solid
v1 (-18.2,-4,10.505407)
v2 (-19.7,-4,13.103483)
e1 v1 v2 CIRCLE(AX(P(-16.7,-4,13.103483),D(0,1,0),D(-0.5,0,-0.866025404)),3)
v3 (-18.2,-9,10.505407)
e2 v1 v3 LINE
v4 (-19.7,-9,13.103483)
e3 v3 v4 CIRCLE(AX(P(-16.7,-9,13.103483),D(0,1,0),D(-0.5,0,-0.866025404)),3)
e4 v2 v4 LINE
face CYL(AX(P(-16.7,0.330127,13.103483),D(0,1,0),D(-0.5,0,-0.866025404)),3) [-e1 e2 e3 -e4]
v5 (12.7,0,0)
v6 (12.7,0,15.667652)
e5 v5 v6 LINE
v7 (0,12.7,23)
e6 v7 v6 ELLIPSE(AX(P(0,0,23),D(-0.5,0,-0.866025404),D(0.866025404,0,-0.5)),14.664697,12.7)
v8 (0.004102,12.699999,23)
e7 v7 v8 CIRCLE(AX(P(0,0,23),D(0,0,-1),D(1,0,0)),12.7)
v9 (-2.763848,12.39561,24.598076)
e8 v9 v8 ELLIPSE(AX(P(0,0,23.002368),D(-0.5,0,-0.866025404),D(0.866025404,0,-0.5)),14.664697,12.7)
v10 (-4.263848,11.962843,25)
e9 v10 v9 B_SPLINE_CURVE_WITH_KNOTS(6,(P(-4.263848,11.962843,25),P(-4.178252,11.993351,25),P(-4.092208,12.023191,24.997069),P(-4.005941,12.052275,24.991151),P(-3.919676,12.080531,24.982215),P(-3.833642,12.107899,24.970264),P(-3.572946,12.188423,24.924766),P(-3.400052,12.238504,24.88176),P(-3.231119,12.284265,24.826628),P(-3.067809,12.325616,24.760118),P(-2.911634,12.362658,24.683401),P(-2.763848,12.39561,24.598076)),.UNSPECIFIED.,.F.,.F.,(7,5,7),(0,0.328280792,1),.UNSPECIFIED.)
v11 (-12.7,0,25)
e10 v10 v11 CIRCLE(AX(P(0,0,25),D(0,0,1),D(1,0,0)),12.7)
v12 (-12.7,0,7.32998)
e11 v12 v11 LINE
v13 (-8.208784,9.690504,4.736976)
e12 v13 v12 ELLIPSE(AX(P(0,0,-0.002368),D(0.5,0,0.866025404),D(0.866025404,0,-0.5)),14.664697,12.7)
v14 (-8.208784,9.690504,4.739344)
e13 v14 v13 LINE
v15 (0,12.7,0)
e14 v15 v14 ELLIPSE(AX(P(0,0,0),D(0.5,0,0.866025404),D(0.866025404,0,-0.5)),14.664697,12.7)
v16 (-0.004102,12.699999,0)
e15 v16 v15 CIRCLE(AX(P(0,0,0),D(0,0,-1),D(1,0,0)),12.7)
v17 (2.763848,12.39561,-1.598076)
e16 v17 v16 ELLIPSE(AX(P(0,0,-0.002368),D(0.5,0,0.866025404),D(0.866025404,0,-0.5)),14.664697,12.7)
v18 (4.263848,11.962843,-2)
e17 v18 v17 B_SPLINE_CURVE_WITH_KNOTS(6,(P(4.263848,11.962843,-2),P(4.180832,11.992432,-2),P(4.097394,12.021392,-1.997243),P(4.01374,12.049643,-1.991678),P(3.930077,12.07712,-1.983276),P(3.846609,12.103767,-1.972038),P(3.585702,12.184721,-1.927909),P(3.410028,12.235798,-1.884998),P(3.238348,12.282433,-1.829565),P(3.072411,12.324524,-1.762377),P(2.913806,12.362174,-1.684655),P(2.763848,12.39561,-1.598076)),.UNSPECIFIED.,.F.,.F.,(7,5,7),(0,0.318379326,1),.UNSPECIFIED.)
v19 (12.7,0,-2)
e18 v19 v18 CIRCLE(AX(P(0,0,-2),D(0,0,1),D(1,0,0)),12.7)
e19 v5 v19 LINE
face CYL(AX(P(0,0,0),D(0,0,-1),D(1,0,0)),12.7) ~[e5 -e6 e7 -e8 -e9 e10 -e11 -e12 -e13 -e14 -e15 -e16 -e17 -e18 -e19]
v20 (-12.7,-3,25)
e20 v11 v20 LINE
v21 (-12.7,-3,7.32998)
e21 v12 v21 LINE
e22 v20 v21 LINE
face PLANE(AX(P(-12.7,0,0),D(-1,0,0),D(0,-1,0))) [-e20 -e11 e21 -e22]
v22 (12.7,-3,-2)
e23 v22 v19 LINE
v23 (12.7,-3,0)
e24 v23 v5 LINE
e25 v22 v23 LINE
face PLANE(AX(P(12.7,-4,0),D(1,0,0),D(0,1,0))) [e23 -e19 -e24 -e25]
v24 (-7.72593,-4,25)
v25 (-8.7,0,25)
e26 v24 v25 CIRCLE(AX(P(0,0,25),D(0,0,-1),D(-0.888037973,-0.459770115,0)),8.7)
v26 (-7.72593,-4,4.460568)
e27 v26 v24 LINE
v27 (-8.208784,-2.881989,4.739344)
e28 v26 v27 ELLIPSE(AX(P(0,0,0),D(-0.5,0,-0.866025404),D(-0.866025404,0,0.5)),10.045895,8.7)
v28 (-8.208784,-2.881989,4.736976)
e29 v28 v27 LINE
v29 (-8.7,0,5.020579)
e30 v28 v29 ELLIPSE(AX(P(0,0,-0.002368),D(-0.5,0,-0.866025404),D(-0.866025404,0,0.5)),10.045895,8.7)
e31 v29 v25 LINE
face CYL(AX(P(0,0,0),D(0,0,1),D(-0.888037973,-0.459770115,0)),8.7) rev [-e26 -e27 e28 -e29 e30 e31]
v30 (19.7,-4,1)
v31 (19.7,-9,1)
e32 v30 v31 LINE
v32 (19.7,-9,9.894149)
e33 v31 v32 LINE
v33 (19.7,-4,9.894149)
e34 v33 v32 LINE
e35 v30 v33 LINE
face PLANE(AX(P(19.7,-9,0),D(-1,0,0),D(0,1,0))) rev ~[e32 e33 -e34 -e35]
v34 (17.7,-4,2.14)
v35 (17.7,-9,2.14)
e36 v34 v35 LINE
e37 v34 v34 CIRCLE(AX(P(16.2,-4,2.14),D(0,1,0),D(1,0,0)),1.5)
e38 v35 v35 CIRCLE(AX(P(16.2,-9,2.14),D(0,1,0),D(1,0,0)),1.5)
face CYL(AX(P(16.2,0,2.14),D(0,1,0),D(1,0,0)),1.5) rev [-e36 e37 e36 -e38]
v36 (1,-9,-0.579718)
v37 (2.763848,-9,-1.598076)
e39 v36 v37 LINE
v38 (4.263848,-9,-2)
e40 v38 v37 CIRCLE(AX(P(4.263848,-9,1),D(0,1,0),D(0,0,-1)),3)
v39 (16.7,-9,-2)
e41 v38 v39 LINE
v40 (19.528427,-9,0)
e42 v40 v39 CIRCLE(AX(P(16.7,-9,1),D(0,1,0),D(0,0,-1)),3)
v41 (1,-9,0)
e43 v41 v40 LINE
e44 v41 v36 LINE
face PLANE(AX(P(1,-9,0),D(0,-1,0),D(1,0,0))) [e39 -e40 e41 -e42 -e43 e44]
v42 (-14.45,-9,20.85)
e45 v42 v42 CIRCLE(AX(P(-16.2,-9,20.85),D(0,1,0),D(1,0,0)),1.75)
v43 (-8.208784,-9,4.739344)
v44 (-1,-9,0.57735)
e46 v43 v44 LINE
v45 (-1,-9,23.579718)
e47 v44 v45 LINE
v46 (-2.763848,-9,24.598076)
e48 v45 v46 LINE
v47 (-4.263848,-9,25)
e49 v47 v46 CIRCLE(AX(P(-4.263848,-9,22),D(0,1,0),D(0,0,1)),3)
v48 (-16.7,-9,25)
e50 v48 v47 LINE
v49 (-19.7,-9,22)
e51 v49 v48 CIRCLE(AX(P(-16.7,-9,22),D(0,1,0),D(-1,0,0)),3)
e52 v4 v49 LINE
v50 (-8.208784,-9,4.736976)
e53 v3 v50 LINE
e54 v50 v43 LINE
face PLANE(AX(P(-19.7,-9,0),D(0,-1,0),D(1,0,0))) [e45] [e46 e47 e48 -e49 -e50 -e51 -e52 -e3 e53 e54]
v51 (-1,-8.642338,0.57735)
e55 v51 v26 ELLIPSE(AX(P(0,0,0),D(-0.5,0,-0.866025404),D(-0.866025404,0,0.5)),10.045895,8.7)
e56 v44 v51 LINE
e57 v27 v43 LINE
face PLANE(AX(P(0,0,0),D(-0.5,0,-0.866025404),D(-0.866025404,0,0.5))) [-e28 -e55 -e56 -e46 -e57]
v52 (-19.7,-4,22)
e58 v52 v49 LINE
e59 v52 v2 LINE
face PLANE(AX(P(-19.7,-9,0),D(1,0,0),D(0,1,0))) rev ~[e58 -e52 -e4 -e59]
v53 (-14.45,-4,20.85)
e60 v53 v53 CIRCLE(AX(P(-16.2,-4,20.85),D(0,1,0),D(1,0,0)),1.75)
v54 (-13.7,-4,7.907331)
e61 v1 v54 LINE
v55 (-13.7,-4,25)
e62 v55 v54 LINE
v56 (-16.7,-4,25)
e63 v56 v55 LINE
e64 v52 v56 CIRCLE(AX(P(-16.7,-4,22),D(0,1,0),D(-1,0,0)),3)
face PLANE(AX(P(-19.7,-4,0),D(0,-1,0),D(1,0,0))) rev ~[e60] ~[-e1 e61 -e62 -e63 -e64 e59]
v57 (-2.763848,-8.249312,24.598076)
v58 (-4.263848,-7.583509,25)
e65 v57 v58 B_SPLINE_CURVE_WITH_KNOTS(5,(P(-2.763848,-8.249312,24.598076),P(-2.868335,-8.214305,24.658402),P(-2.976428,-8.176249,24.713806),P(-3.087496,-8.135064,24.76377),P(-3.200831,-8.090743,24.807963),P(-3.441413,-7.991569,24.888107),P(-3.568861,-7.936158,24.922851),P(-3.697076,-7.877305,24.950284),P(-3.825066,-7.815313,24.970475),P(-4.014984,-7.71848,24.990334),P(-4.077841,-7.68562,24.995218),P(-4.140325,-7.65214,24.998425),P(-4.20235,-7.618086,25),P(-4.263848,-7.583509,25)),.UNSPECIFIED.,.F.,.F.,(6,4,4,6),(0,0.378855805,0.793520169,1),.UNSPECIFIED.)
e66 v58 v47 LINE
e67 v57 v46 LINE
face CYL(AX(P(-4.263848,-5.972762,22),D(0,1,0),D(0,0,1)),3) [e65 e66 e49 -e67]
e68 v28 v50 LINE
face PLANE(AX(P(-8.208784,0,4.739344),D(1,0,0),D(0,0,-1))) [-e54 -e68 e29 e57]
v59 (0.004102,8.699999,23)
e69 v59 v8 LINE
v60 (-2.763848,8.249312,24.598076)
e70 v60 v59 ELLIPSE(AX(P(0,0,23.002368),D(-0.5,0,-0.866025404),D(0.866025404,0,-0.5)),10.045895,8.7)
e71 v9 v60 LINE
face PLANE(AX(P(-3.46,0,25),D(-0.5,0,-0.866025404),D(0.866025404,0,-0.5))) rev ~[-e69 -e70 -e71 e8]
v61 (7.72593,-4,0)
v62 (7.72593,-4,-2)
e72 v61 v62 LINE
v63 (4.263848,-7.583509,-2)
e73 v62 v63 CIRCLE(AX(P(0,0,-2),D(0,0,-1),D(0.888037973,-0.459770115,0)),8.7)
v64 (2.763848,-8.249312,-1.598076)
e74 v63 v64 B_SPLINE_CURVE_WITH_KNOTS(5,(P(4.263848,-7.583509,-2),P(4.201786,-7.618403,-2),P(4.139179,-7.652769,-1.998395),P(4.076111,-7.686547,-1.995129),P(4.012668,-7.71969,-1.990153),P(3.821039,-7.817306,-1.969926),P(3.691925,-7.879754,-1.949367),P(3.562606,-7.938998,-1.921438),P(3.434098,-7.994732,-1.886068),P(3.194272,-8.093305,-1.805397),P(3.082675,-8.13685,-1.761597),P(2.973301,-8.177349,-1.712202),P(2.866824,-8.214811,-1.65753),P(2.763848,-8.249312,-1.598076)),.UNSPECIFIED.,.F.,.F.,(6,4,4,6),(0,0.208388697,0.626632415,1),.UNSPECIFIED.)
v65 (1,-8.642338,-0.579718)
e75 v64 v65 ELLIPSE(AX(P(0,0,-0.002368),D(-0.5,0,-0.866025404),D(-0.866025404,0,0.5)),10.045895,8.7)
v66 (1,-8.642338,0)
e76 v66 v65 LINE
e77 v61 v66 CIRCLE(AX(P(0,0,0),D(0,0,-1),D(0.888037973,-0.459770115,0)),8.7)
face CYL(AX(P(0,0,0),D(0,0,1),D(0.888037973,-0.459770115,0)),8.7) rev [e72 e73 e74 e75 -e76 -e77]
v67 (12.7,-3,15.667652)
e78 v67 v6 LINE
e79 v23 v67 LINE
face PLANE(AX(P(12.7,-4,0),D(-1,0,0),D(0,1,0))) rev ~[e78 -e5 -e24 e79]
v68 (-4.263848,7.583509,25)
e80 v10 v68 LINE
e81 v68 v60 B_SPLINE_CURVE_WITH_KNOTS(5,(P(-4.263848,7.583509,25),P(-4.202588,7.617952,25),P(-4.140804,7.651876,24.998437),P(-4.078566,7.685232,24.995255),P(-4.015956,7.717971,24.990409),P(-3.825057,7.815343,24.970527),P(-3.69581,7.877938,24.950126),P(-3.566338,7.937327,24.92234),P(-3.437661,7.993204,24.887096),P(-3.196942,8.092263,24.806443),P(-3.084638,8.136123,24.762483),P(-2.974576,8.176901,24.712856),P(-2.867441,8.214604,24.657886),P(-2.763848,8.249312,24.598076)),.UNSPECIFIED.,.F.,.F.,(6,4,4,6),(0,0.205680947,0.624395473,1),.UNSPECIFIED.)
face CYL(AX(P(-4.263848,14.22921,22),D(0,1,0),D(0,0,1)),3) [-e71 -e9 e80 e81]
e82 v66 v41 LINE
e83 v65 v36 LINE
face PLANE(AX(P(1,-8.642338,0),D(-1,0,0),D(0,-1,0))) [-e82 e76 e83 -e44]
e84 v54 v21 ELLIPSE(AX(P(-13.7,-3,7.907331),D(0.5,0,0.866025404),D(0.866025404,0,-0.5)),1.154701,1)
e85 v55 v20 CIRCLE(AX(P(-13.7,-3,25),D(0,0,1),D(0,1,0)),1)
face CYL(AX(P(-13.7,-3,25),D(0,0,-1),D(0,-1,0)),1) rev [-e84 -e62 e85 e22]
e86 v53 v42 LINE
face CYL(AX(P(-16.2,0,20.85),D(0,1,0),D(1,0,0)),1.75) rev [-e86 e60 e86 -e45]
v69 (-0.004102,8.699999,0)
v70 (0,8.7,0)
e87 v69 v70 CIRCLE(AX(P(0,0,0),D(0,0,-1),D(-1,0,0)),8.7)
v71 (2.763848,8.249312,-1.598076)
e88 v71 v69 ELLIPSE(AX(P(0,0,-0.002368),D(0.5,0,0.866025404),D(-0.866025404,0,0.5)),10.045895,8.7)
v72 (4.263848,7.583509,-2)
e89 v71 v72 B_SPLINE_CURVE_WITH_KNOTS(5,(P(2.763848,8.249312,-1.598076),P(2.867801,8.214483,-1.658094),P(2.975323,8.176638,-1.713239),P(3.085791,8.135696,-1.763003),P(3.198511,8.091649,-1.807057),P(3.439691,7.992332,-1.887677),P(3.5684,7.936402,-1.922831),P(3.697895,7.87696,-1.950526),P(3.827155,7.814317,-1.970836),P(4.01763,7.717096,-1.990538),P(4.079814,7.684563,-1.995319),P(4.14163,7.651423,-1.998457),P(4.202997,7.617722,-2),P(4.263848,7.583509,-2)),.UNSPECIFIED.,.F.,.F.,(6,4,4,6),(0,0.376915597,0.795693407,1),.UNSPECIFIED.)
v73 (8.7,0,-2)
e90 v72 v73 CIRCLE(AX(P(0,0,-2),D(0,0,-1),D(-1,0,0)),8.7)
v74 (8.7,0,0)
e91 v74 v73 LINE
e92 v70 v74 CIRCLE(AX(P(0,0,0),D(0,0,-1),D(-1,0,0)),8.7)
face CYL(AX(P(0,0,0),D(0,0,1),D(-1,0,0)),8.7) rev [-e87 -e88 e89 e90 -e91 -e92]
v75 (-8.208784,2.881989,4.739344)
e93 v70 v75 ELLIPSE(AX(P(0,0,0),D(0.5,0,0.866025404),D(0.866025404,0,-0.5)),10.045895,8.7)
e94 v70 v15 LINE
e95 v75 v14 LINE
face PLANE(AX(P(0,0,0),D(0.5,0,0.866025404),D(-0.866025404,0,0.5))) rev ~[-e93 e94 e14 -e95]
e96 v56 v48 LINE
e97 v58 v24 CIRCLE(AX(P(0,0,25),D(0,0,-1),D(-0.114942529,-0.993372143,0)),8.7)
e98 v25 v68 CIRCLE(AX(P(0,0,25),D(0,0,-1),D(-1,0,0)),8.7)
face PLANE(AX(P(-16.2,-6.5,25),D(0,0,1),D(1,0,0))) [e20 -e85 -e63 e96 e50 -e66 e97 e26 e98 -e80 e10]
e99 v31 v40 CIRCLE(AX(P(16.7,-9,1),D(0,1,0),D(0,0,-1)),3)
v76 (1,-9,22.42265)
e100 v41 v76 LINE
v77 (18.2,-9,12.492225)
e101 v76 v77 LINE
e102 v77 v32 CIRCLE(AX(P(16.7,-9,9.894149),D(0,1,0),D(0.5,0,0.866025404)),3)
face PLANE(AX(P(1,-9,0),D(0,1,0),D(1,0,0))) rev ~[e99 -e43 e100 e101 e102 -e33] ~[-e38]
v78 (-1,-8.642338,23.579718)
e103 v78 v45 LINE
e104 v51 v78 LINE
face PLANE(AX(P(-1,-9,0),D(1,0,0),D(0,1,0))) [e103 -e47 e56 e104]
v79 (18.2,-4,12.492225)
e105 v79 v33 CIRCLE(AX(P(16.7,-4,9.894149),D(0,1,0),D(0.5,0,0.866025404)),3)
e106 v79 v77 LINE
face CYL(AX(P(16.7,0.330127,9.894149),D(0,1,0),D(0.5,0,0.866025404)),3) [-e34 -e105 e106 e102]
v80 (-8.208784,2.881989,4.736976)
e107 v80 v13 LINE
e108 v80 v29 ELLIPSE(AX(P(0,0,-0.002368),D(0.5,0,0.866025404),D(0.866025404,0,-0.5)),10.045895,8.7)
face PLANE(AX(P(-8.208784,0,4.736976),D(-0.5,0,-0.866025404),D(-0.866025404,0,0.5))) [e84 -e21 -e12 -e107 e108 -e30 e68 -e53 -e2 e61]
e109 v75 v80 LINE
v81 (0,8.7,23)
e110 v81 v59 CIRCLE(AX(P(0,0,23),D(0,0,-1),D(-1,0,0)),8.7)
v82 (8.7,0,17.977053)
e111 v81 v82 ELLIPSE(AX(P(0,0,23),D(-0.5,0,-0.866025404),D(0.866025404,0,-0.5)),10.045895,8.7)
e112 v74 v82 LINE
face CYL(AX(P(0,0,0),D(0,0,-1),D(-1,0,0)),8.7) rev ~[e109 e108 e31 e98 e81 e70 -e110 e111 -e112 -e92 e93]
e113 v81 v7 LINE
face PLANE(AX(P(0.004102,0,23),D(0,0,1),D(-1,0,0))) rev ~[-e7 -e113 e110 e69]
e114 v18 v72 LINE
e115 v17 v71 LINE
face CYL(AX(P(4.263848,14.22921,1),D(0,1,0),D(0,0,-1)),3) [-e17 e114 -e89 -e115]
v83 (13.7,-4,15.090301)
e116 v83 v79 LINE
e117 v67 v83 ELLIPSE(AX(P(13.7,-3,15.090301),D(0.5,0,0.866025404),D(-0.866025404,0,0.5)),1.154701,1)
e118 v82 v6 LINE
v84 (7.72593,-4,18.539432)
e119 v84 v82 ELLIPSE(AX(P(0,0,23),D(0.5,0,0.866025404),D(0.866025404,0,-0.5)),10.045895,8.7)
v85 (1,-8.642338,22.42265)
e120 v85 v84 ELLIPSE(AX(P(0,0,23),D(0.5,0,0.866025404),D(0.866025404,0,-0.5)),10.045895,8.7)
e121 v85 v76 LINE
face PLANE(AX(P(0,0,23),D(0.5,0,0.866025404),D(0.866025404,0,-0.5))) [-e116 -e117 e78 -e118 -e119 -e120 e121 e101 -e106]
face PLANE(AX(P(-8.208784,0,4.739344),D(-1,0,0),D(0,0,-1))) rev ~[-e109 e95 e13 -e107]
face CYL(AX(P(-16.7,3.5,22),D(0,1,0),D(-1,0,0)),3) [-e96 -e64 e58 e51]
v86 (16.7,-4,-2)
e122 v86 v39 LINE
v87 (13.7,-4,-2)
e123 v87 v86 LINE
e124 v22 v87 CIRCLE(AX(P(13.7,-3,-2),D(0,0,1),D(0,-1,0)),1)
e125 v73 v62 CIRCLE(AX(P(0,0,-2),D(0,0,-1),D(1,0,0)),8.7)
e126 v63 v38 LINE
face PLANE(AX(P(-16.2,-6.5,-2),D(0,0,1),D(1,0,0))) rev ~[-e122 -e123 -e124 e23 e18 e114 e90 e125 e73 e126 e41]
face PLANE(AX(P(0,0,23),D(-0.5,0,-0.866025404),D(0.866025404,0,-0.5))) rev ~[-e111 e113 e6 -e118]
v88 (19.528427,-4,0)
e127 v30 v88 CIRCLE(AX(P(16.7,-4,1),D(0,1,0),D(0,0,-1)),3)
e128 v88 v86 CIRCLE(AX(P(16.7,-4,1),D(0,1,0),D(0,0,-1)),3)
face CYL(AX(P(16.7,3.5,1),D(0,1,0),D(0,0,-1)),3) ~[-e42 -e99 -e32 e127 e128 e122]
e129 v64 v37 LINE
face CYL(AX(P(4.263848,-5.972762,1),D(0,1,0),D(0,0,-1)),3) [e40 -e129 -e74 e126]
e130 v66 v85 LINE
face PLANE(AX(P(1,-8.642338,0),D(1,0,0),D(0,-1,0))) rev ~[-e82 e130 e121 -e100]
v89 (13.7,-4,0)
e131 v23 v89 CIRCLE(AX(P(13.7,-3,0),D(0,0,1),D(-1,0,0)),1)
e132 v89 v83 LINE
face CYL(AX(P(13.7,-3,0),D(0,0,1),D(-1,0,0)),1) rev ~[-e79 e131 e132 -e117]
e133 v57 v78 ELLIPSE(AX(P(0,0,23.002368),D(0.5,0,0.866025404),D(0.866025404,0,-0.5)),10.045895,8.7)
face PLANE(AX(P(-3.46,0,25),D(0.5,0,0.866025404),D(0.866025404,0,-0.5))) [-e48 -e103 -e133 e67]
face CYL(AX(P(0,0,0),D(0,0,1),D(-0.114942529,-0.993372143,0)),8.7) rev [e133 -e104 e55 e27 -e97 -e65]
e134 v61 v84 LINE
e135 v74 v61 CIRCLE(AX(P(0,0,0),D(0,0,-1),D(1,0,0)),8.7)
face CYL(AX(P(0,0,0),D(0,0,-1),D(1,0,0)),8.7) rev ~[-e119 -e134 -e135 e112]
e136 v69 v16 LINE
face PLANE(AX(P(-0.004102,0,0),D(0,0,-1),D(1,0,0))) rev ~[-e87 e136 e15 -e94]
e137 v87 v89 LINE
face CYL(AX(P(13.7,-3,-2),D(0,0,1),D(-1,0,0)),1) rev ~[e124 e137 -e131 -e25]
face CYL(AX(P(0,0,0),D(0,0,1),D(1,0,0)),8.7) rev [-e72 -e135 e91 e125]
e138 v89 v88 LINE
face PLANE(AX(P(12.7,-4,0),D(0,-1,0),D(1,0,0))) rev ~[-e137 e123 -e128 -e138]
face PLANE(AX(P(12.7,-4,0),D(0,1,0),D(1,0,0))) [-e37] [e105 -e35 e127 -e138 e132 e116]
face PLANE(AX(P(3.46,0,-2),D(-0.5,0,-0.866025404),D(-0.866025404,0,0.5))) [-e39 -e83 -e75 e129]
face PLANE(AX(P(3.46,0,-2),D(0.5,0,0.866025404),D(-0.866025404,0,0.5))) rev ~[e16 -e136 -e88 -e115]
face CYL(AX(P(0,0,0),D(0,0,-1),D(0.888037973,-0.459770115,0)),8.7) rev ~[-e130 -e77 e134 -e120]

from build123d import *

# Parameters (mm, degrees)
F0_W          = 7
F0_H          = 5
F1_DEPTH      = 25
F1_DEPTH_BACK = 2
F4_DEPTH      = 25
F4_DEPTH_BACK = 25
F5_DEPTH      = 25
F5_DEPTH_BACK = 25
F6_R          = 1
F7_R          = 1.75
F7_R_2        = 1.5
F8_DEPTH      = 25
F9_T1_DEPTH   = 20
F9_T3_DEPTH   = 13.6602540378
F9_T5_DEPTH   = 8.256448117
F9_T7_DEPTH   = 5.0368572892


# Not quite as in the source:
# - a fillet or chamfer that OpenCascade refuses, or shapes differently, is made with other operations: its cross-section is extruded or revolved along the edge and cut away or added


with BuildPart() as f1:
    # F0 (on Top) → F1 (new body, two sides)
    with BuildSketch(Plane.XY) as f1_sk:
        with Locations((-16.2, -6.5)):
            Rectangle(F0_W, F0_H)
        with Locations((16.2, -6.5)):
            Rectangle(F0_W, F0_H)
        with BuildLine():
            ThreePointArc((-12.0536301586, -4), (-12.5373662109, -2.0259438524), (-12.7, 0))
            Line((-12.7, 0), (-12.7, -4))
            Line((-12.7, -4), (-12.0536301586, -4))
        make_face()
        with BuildLine():
            Line((12.7, -4), (12.7, 0))
            ThreePointArc((12.7, 0), (12.5373662109, -2.0259438524), (12.0536301586, -4))
            Line((12.0536301586, -4), (12.7, -4))
        make_face()
        with BuildLine():
            ThreePointArc((-8.7, 0), (0, 8.7), (8.7, 0))
            Line((8.7, 0), (12.7, 0))
            ThreePointArc((12.7, 0), (0, 12.7), (-12.7, 0))
            Line((-12.7, 0), (-8.7, 0))
        make_face()
        with BuildLine():
            ThreePointArc((-8.9604687377, -9), (-10.8003744429, -6.6814603115), (-12.0536301586, -4))
            Line((-12.0536301586, -4), (-12.7, -4))
            Line((-12.7, -4), (-12.7, -9))
            Line((-12.7, -9), (-8.9604687377, -9))
        make_face()
        with BuildLine():
            Line((12.7, -4), (12.0536301586, -4))
            ThreePointArc((12.0536301586, -4), (10.8003744429, -6.6814603115), (8.9604687377, -9))
            Line((8.9604687377, -9), (12.7, -9))
            Line((12.7, -9), (12.7, -4))
        make_face()
        with BuildLine():
            ThreePointArc((-7.7259303647, -4), (-8.452975635, -2.0584467235), (-8.7, 0))
            Line((-8.7, 0), (-12.7, 0))
            ThreePointArc((-12.7, 0), (-12.5373662109, -2.0259438524), (-12.0536301586, -4))
            Line((-12.0536301586, -4), (-7.7259303647, -4))
        make_face()
        with BuildLine():
            Line((12.7, 0), (8.7, 0))
            ThreePointArc((8.7, 0), (8.452975635, -2.0584467235), (7.7259303647, -4))
            Line((7.7259303647, -4), (12.0536301586, -4))
            ThreePointArc((12.0536301586, -4), (12.5373662109, -2.0259438524), (12.7, 0))
        make_face()
        with BuildLine():
            ThreePointArc((-1, -8.6423376467), (-4.9419925019, -7.1600775213), (-7.7259303647, -4))
            Line((-7.7259303647, -4), (-12.0536301586, -4))
            ThreePointArc((-12.0536301586, -4), (-10.8003744429, -6.6814603115), (-8.9604687377, -9))
            Line((-8.9604687377, -9), (-1, -9))
            Line((-1, -9), (-1, -8.6423376467))
        make_face()
        with BuildLine():
            Line((12.0536301586, -4), (7.7259303647, -4))
            ThreePointArc((7.7259303647, -4), (4.9419925019, -7.1600775213), (1, -8.6423376467))
            Line((1, -8.6423376467), (1, -9))
            Line((1, -9), (8.9604687377, -9))
            ThreePointArc((8.9604687377, -9), (10.8003744429, -6.6814603115), (12.0536301586, -4))
        make_face()
    extrude(amount=F1_DEPTH)
    extrude(f1_sk.sketch, amount=-F1_DEPTH_BACK)

    # F3 (on Front) → F4 (cut, two sides)
    with BuildSketch(Plane.XZ) as f4_sk:
        Polygon((0.0041016151, 23), (0, 23), (39.8371685741, 0), (39.8371685741, 23), (28.9984290028, 23), (28.9984290028, 6.2601172778), align=None)
        Polygon((-3.46, 25), (0.0041016151, 23), (28.9984290028, 23), (28.9984290028, 25), align=None)
        Polygon((28.9984290028, 23), (0.0041016151, 23), (28.9984290028, 6.2601172778), align=None)
    extrude(amount=F4_DEPTH, mode=Mode.SUBTRACT)
    extrude(f4_sk.sketch, amount=-F4_DEPTH_BACK, mode=Mode.SUBTRACT)

    # F2 (on Front) → F5 (cut, two sides)
    with BuildSketch(Plane.XZ) as f5_sk:
        Polygon((-0.0041016151, 0), (0, 0), (-8.2087842873, 4.739343818), (-8.2087842873, 4.7369757494), align=None)
        Polygon((3.46, -2), (-0.0041016151, 0), (-8.2087842873, 0), (-8.2087842873, 4.7369757494), (-21.54, 12.4337567297), (-21.54, -2), align=None)
        Polygon((-8.2087842873, 0), (-0.0041016151, 0), (-8.2087842873, 4.7369757494), align=None)
    extrude(amount=F5_DEPTH, mode=Mode.SUBTRACT)
    extrude(f5_sk.sketch, amount=-F5_DEPTH_BACK, mode=Mode.SUBTRACT)

    # F6
    f6_edges = [f1.edges().sort_by_distance(p)[0] for p in [
        (12.7, -4, 6.833826),
        (-12.7, -4, 16.16499),
    ]]
    fillet(f6_edges, radius=F6_R)

    # F7 (on Front) → F8 (cut)
    with BuildSketch(Plane.XZ):
        with Locations((-16.2, 20.85)):
            Circle(F7_R)
        with Locations((16.2, 2.14)):
            Circle(F7_R_2)
    extrude(amount=F8_DEPTH, mode=Mode.SUBTRACT)

    # F9: fillet of radius 3 on 8 edges, made by hand

    # F9_s2 → F9_t1 (cut)
    with BuildSketch(Plane.XZ.offset(-3.5)):
        with BuildLine():
            ThreePointArc((16.7, -2), (18.8213203436, -1.1213203436), (19.7, 1))
            Line((19.7, 1), (19.7, -2))
            Line((19.7, -2), (16.7, -2))
        make_face()
        with BuildLine():
            ThreePointArc((-19.7, 22), (-18.8213203436, 24.1213203436), (-16.7, 25))
            Line((-16.7, 25), (-19.7, 25))
            Line((-19.7, 25), (-19.7, 22))
        make_face()
    extrude(amount=F9_T1_DEPTH, mode=Mode.SUBTRACT)

    # F9_s4 → F9_t3 (cut)
    with BuildSketch(Plane.XZ.offset(-0.3301270189)):
        with BuildLine():
            ThreePointArc((18.2, 12.4922251007), (19.2980762114, 11.3941488894), (19.7, 9.8941488894))
            Line((19.7, 9.8941488894), (19.7, 11.626199697))
            Line((19.7, 11.626199697), (18.2, 12.4922251007))
        make_face()
        with BuildLine():
            ThreePointArc((-18.2, 10.5054068306), (-19.2980762114, 11.603483042), (-19.7, 13.103483042))
            Line((-19.7, 13.103483042), (-19.7, 11.3714322344))
            Line((-19.7, 11.3714322344), (-18.2, 10.5054068306))
        make_face()
    extrude(amount=F9_T3_DEPTH, mode=Mode.SUBTRACT)

    # F9_s6 → F9_t5 (cut)
    with BuildSketch(Plane.XZ.offset(-14.2292097711)):
        with BuildLine():
            ThreePointArc((-4.2638475773, 25), (-3.487390442, 24.8977774789), (-2.7638475773, 24.5980762114))
            Line((-2.7638475773, 24.5980762114), (-3.46, 25))
            Line((-3.46, 25), (-4.2638475773, 25))
        make_face()
        with BuildLine():
            ThreePointArc((4.2638475773, -2), (3.487390442, -1.8977774789), (2.7638475773, -1.5980762114))
            Line((2.7638475773, -1.5980762114), (3.46, -2))
            Line((3.46, -2), (4.2638475773, -2))
        make_face()
    extrude(amount=F9_T5_DEPTH, mode=Mode.SUBTRACT)

    # F9_s8 → F9_t7 (cut)
    with BuildSketch(Plane.XZ.offset(5.9727616541)):
        with BuildLine():
            ThreePointArc((4.2638475773, -2), (3.487390442, -1.8977774789), (2.7638475773, -1.5980762114))
            Line((2.7638475773, -1.5980762114), (3.46, -2))
            Line((3.46, -2), (4.2638475773, -2))
        make_face()
        with BuildLine():
            ThreePointArc((-4.2638475773, 25), (-3.487390442, 24.8977774789), (-2.7638475773, 24.5980762114))
            Line((-2.7638475773, 24.5980762114), (-3.46, 25))
            Line((-3.46, 25), (-4.2638475773, 25))
        make_face()
    extrude(amount=F9_T7_DEPTH, mode=Mode.SUBTRACT)


solid = f1.part
